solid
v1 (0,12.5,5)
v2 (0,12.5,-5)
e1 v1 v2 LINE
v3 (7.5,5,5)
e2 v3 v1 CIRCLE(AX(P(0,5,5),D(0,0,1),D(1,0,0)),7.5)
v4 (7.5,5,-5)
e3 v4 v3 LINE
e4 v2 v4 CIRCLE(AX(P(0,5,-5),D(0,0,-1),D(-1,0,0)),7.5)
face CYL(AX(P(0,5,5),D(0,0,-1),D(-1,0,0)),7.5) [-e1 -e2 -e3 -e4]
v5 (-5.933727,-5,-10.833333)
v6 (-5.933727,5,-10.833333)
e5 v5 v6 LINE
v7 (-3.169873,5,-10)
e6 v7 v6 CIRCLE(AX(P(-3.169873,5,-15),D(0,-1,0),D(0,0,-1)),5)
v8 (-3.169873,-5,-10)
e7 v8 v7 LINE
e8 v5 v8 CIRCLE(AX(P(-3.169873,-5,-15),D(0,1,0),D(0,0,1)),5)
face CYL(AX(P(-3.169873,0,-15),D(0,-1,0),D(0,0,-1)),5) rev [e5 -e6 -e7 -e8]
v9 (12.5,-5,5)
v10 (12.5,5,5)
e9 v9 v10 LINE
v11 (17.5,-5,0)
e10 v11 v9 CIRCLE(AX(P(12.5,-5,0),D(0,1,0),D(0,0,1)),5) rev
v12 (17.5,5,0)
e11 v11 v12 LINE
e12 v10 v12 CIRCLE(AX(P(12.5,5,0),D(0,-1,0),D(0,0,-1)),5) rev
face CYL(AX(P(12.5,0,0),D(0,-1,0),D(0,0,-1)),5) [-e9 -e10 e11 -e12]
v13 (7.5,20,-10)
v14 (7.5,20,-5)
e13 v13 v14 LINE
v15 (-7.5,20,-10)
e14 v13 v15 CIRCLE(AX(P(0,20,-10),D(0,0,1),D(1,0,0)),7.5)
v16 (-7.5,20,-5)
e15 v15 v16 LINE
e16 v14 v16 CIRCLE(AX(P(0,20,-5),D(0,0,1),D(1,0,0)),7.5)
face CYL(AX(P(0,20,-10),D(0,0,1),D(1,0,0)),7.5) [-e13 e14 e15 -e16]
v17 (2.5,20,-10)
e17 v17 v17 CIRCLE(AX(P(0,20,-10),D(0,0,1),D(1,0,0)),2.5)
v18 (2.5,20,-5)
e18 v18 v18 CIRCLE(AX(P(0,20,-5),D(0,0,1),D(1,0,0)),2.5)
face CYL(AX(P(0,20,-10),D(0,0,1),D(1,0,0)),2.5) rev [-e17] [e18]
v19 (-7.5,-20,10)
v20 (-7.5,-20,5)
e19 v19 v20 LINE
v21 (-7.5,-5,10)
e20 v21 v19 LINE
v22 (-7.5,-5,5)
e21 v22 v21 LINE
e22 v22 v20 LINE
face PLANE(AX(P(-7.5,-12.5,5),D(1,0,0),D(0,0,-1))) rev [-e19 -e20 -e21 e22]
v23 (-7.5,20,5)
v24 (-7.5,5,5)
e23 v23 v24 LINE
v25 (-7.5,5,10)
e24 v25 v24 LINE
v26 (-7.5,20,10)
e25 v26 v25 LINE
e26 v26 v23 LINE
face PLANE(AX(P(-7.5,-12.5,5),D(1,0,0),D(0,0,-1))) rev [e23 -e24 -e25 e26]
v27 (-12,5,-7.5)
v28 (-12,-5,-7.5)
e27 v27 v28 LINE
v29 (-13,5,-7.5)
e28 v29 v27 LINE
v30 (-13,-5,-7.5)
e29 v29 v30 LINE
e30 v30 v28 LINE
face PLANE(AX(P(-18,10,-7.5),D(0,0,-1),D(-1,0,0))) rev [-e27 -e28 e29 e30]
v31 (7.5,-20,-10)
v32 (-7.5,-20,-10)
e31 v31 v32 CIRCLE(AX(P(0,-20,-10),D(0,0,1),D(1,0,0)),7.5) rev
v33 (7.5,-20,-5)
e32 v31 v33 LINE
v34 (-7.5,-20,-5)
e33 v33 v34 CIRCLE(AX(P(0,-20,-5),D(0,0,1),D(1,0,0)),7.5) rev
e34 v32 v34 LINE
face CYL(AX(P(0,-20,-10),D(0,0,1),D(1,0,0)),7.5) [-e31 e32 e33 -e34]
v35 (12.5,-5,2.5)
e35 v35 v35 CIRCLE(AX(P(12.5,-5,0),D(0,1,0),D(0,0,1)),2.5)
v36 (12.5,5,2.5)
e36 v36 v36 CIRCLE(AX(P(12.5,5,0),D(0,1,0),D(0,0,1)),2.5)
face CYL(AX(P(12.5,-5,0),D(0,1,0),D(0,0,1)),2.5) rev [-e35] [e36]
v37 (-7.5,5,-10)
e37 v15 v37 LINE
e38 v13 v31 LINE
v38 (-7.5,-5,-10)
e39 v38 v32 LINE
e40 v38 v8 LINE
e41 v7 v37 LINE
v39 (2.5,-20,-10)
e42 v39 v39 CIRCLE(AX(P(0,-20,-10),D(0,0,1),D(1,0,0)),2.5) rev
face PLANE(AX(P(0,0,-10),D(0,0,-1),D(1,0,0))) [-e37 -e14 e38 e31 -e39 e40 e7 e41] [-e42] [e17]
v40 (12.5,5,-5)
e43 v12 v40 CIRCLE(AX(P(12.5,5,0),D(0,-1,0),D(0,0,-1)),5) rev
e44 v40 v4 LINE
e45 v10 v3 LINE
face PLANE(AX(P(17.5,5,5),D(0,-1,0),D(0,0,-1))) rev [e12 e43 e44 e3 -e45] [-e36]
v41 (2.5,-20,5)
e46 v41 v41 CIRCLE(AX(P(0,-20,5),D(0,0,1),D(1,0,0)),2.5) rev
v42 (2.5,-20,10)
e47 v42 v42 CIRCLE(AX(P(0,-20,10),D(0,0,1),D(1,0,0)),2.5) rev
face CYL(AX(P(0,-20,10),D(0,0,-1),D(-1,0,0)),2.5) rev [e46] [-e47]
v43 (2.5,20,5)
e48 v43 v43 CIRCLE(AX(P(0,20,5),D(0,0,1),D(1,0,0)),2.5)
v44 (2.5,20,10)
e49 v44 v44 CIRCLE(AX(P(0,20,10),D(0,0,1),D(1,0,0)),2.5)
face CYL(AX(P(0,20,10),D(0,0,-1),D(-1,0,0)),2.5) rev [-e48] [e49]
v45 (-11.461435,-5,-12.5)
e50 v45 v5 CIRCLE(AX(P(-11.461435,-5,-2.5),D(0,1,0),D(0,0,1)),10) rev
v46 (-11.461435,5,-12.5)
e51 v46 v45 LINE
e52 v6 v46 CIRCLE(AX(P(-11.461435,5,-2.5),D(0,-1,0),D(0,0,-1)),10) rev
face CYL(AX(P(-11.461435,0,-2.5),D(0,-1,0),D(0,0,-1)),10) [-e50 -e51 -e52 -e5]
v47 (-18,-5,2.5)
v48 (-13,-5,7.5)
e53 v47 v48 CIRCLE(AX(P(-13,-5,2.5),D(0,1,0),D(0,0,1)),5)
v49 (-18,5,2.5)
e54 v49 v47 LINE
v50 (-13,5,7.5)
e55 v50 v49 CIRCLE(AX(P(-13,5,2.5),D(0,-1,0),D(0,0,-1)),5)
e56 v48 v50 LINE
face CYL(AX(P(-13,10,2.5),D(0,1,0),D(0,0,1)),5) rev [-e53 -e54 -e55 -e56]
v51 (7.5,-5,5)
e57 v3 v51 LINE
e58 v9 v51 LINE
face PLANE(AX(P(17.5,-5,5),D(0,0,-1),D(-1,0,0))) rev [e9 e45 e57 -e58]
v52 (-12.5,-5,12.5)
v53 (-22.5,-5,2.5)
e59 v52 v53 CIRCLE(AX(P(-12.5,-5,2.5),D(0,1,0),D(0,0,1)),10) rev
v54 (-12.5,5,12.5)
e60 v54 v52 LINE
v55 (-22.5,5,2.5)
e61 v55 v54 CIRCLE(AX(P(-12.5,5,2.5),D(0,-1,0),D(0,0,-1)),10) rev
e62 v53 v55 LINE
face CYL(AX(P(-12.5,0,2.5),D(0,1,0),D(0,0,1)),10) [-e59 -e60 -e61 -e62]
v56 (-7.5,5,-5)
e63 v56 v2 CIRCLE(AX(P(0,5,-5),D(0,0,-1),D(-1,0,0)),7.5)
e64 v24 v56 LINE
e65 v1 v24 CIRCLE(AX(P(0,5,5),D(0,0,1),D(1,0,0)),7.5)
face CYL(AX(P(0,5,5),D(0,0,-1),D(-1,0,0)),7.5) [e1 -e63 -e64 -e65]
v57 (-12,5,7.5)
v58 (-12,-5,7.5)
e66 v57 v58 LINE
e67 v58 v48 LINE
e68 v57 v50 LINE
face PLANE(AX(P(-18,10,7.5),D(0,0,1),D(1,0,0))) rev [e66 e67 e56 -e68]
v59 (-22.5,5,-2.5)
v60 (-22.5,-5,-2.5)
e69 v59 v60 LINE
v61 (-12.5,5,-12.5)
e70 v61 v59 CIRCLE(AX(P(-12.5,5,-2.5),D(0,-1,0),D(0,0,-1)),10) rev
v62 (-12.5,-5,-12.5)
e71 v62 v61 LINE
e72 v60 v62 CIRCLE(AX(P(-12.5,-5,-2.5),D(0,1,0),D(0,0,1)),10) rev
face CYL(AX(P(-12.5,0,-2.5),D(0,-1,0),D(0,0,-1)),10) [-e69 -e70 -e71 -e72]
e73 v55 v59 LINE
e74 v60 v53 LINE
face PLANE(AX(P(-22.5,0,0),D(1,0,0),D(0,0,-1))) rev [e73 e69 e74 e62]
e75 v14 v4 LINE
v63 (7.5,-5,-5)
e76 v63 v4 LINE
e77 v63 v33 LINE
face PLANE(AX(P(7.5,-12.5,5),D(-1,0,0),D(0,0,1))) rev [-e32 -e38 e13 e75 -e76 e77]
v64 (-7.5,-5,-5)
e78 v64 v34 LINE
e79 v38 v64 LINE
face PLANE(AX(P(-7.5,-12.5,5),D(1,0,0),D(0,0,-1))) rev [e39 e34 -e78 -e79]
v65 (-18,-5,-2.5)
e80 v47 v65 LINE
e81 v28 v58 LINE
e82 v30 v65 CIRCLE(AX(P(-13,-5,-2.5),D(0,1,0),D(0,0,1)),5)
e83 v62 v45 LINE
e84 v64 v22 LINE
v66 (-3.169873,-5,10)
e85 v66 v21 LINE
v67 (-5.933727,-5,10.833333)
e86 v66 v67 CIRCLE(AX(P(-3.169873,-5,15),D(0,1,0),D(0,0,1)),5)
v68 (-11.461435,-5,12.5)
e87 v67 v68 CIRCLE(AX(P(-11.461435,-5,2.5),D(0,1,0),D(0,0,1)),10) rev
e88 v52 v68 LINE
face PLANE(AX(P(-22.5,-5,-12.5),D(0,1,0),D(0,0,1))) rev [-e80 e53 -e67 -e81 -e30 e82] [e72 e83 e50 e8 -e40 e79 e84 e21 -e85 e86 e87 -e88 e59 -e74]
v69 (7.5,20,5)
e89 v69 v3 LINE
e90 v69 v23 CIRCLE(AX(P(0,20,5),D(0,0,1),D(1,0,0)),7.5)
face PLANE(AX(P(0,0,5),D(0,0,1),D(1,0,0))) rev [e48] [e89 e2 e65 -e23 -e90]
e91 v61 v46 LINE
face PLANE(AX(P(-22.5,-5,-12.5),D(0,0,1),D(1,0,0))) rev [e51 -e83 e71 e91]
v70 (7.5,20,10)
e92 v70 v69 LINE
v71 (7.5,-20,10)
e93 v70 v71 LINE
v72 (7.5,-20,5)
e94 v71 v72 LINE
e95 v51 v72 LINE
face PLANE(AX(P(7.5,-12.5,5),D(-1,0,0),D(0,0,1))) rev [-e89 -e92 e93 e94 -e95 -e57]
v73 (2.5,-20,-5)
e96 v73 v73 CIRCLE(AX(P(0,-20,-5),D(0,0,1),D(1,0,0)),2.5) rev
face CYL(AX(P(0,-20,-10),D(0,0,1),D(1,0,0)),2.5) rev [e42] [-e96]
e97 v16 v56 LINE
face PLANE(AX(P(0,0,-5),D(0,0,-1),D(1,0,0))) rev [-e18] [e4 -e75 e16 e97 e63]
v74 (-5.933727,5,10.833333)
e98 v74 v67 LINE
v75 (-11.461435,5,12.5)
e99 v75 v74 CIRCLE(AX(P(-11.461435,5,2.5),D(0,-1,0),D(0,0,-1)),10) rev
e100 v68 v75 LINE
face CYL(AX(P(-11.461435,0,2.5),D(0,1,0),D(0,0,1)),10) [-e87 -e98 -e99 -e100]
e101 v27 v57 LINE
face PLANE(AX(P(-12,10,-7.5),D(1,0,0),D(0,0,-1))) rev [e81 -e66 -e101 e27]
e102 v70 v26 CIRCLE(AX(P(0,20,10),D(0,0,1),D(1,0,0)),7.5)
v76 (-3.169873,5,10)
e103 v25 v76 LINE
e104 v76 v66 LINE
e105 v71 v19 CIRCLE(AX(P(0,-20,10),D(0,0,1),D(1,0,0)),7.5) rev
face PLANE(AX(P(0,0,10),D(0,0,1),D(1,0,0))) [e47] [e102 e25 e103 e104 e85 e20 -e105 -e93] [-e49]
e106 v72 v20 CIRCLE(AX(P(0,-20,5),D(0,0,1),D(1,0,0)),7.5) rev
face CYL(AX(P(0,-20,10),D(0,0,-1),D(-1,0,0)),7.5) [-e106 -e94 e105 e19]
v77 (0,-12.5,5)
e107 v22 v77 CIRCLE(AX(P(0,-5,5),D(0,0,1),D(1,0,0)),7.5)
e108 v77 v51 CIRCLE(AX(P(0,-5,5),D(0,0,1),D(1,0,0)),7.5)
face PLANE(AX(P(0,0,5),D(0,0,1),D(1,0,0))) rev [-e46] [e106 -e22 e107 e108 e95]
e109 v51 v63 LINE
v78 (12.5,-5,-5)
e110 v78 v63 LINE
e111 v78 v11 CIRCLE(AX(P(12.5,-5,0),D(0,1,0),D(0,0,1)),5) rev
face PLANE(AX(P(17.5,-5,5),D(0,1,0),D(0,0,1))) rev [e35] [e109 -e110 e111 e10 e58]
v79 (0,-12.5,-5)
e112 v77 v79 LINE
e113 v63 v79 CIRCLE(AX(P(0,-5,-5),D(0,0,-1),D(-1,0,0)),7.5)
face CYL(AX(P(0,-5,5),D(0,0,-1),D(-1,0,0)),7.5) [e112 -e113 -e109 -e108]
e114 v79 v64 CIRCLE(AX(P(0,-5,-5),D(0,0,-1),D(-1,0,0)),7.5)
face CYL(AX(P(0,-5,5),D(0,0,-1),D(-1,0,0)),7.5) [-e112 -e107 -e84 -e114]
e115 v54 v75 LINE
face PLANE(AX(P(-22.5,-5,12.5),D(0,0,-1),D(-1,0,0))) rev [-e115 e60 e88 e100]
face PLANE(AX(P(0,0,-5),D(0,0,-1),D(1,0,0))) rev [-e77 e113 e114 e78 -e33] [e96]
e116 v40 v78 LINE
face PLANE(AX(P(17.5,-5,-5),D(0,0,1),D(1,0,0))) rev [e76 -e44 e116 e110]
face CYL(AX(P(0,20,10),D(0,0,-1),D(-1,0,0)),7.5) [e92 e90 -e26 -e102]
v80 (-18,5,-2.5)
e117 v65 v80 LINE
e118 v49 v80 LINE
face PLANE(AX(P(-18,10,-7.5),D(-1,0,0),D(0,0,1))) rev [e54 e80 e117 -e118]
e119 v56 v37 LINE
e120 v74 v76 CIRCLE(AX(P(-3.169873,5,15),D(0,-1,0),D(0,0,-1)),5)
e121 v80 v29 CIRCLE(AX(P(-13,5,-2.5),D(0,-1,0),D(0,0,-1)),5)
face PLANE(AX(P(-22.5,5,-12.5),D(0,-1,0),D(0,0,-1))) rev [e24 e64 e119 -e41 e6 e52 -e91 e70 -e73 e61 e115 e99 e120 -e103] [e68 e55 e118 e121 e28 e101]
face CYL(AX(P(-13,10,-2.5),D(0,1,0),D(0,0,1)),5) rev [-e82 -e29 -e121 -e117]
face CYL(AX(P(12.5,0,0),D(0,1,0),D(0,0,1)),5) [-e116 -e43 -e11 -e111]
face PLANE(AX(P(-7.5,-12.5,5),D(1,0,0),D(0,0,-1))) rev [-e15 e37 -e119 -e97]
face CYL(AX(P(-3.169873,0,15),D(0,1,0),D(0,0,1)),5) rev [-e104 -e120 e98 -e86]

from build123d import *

# Parameters (mm, degrees)
SKETCH1_W           = 15
SKETCH1_H           = 25
BOSS_EXTRUDE1_DEPTH = 5
SKETCH2_R           = 2.5
BOSS_EXTRUDE2_DEPTH = 5
FILLET1_R           = 7.5
SKETCH3_W           = 10
SKETCH3_H           = 10
BOSS_EXTRUDE3_DEPTH = 10
FILLET2_R           = 5
SKETCH4_R           = 2.5
CUT_EXTRUDE1_DEPTH  = 10
SKETCH5_W           = 25
SKETCH5_H           = 10
BOSS_EXTRUDE4_DEPTH = 15
SKETCH6_W           = 6
SKETCH6_H           = 15
CUT_EXTRUDE2_DEPTH  = 15
FILLET3_R           = 5
FILLET4_R           = 10
FILLET5_R           = 5


# Some blends are built 0.0001 mm under size
with BuildPart() as part:
    # Sketch1 → Boss-Extrude1 (new, symmetric)
    with BuildSketch(Plane.XY):
        Rectangle(SKETCH1_W, SKETCH1_H)
    extrude(amount=BOSS_EXTRUDE1_DEPTH, both=True)

    # Sketch2 → Boss-Extrude2 (add)
    with BuildSketch(Plane.XY.offset(5)):
        with BuildLine():
            ThreePointArc((-7.5, -20), (0, -27.5), (7.5, -20))
            Line((7.5, -20), (7.5, 20))
            ThreePointArc((7.5, 20), (0, 27.5), (-7.5, 20))
            Line((-7.5, 20), (-7.5, -20))
        make_face()
        with Locations((0, -20)):
            Circle(SKETCH2_R, mode=Mode.SUBTRACT)
        with Locations((0, 20)):
            Circle(SKETCH2_R, mode=Mode.SUBTRACT)
    boss_extrude2 = extrude(amount=BOSS_EXTRUDE2_DEPTH)

    # Mirror1: Boss-Extrude2 across plane
    add(boss_extrude2.mirror(Plane.XY))

    # Fillet1
    fillet1_edges = [part.edges().sort_by_distance(p)[0] for p in [
        (7.5, -12.5, 0),
        (-7.5, -12.5, 0),
        (-7.5, 12.5, 0),
        (7.5, 12.5, 0),
    ]]
    fillet(fillet1_edges, radius=FILLET1_R - 0.0001)  # a hair under: the kernel refuses the full size

    # Sketch3 → Boss-Extrude3 (add)
    with BuildSketch(Plane(origin=(7.5, 0, 0), x_dir=(0, 0, -1), z_dir=(1, 0, 0))):
        Rectangle(SKETCH3_W, SKETCH3_H)
    extrude(amount=BOSS_EXTRUDE3_DEPTH)

    # Fillet2
    fillet2_edges = [part.edges().sort_by_distance(p)[0] for p in [
        (17.5, 0, 5),
        (17.5, 0, -5),
    ]]
    fillet(fillet2_edges, radius=FILLET2_R - 0.0001)  # a hair under: the kernel refuses the full size

    # Sketch4 → Cut-Extrude1 (cut)
    with BuildSketch(Plane(origin=(0, 5, 0), x_dir=(1, 0, 0), z_dir=(0, 1, 0))):
        with Locations(Location((12.5, 0, 0), (0, 0, 270))):
            Circle(SKETCH4_R)
    extrude(amount=-CUT_EXTRUDE1_DEPTH, mode=Mode.SUBTRACT)

    # Sketch5 → Boss-Extrude4 (add)
    with BuildSketch(Plane.ZY.offset(7.5)):
        Rectangle(SKETCH5_W, SKETCH5_H)
    extrude(amount=BOSS_EXTRUDE4_DEPTH)

    # Sketch6 → Cut-Extrude2 (cut)
    with BuildSketch(Plane.XZ.offset(5)):
        with Locations((-15, 0)):
            Rectangle(SKETCH6_W, SKETCH6_H)
    extrude(amount=-CUT_EXTRUDE2_DEPTH, mode=Mode.SUBTRACT)

    # Fillet3
    # the kernel refuses this fillet: 5 mm, written as the material it adds along each edge
    with BuildSketch(Plane(origin=(-7.5, 5, 10), x_dir=(1, 0, 0), z_dir=(0, -1, 0))) as fillet3_piece_1:
        with BuildLine():
            CenterArc((4.330127019, 5), FILLET3_R, 210, 60)
            Line((0, 2.5), (0, 0))
            Line((0, 0), (4.330127019, 0))
        make_face()
    extrude(amount=10)
    with BuildSketch(Plane(origin=(-7.5, 5, -10), x_dir=(1, 0, 0), z_dir=(0, -1, 0))) as fillet3_piece_2:
        with BuildLine():
            CenterArc((4.330127019, -5), FILLET3_R, 90, 60)
            Line((0, -2.5), (0, 0))
            Line((0, 0), (4.330127019, 0))
        make_face()
    extrude(amount=10)

    # Fillet4
    fillet4_edges = [part.edges().sort_by_distance(p)[0] for p in [
        (-7.5, 0, 12.5),
        (-7.5, 0, -12.5),
        (-22.5, 0, 12.5),
        (-22.5, 0, -12.5),
    ]]
    fillet(fillet4_edges, radius=FILLET4_R)

    # Fillet5
    fillet5_edges = [part.edges().sort_by_distance(p)[0] for p in [
        (-18, 0, -7.5),
        (-18, 0, 7.5),
    ]]
    fillet(fillet5_edges, radius=FILLET5_R)


solid = part.part
